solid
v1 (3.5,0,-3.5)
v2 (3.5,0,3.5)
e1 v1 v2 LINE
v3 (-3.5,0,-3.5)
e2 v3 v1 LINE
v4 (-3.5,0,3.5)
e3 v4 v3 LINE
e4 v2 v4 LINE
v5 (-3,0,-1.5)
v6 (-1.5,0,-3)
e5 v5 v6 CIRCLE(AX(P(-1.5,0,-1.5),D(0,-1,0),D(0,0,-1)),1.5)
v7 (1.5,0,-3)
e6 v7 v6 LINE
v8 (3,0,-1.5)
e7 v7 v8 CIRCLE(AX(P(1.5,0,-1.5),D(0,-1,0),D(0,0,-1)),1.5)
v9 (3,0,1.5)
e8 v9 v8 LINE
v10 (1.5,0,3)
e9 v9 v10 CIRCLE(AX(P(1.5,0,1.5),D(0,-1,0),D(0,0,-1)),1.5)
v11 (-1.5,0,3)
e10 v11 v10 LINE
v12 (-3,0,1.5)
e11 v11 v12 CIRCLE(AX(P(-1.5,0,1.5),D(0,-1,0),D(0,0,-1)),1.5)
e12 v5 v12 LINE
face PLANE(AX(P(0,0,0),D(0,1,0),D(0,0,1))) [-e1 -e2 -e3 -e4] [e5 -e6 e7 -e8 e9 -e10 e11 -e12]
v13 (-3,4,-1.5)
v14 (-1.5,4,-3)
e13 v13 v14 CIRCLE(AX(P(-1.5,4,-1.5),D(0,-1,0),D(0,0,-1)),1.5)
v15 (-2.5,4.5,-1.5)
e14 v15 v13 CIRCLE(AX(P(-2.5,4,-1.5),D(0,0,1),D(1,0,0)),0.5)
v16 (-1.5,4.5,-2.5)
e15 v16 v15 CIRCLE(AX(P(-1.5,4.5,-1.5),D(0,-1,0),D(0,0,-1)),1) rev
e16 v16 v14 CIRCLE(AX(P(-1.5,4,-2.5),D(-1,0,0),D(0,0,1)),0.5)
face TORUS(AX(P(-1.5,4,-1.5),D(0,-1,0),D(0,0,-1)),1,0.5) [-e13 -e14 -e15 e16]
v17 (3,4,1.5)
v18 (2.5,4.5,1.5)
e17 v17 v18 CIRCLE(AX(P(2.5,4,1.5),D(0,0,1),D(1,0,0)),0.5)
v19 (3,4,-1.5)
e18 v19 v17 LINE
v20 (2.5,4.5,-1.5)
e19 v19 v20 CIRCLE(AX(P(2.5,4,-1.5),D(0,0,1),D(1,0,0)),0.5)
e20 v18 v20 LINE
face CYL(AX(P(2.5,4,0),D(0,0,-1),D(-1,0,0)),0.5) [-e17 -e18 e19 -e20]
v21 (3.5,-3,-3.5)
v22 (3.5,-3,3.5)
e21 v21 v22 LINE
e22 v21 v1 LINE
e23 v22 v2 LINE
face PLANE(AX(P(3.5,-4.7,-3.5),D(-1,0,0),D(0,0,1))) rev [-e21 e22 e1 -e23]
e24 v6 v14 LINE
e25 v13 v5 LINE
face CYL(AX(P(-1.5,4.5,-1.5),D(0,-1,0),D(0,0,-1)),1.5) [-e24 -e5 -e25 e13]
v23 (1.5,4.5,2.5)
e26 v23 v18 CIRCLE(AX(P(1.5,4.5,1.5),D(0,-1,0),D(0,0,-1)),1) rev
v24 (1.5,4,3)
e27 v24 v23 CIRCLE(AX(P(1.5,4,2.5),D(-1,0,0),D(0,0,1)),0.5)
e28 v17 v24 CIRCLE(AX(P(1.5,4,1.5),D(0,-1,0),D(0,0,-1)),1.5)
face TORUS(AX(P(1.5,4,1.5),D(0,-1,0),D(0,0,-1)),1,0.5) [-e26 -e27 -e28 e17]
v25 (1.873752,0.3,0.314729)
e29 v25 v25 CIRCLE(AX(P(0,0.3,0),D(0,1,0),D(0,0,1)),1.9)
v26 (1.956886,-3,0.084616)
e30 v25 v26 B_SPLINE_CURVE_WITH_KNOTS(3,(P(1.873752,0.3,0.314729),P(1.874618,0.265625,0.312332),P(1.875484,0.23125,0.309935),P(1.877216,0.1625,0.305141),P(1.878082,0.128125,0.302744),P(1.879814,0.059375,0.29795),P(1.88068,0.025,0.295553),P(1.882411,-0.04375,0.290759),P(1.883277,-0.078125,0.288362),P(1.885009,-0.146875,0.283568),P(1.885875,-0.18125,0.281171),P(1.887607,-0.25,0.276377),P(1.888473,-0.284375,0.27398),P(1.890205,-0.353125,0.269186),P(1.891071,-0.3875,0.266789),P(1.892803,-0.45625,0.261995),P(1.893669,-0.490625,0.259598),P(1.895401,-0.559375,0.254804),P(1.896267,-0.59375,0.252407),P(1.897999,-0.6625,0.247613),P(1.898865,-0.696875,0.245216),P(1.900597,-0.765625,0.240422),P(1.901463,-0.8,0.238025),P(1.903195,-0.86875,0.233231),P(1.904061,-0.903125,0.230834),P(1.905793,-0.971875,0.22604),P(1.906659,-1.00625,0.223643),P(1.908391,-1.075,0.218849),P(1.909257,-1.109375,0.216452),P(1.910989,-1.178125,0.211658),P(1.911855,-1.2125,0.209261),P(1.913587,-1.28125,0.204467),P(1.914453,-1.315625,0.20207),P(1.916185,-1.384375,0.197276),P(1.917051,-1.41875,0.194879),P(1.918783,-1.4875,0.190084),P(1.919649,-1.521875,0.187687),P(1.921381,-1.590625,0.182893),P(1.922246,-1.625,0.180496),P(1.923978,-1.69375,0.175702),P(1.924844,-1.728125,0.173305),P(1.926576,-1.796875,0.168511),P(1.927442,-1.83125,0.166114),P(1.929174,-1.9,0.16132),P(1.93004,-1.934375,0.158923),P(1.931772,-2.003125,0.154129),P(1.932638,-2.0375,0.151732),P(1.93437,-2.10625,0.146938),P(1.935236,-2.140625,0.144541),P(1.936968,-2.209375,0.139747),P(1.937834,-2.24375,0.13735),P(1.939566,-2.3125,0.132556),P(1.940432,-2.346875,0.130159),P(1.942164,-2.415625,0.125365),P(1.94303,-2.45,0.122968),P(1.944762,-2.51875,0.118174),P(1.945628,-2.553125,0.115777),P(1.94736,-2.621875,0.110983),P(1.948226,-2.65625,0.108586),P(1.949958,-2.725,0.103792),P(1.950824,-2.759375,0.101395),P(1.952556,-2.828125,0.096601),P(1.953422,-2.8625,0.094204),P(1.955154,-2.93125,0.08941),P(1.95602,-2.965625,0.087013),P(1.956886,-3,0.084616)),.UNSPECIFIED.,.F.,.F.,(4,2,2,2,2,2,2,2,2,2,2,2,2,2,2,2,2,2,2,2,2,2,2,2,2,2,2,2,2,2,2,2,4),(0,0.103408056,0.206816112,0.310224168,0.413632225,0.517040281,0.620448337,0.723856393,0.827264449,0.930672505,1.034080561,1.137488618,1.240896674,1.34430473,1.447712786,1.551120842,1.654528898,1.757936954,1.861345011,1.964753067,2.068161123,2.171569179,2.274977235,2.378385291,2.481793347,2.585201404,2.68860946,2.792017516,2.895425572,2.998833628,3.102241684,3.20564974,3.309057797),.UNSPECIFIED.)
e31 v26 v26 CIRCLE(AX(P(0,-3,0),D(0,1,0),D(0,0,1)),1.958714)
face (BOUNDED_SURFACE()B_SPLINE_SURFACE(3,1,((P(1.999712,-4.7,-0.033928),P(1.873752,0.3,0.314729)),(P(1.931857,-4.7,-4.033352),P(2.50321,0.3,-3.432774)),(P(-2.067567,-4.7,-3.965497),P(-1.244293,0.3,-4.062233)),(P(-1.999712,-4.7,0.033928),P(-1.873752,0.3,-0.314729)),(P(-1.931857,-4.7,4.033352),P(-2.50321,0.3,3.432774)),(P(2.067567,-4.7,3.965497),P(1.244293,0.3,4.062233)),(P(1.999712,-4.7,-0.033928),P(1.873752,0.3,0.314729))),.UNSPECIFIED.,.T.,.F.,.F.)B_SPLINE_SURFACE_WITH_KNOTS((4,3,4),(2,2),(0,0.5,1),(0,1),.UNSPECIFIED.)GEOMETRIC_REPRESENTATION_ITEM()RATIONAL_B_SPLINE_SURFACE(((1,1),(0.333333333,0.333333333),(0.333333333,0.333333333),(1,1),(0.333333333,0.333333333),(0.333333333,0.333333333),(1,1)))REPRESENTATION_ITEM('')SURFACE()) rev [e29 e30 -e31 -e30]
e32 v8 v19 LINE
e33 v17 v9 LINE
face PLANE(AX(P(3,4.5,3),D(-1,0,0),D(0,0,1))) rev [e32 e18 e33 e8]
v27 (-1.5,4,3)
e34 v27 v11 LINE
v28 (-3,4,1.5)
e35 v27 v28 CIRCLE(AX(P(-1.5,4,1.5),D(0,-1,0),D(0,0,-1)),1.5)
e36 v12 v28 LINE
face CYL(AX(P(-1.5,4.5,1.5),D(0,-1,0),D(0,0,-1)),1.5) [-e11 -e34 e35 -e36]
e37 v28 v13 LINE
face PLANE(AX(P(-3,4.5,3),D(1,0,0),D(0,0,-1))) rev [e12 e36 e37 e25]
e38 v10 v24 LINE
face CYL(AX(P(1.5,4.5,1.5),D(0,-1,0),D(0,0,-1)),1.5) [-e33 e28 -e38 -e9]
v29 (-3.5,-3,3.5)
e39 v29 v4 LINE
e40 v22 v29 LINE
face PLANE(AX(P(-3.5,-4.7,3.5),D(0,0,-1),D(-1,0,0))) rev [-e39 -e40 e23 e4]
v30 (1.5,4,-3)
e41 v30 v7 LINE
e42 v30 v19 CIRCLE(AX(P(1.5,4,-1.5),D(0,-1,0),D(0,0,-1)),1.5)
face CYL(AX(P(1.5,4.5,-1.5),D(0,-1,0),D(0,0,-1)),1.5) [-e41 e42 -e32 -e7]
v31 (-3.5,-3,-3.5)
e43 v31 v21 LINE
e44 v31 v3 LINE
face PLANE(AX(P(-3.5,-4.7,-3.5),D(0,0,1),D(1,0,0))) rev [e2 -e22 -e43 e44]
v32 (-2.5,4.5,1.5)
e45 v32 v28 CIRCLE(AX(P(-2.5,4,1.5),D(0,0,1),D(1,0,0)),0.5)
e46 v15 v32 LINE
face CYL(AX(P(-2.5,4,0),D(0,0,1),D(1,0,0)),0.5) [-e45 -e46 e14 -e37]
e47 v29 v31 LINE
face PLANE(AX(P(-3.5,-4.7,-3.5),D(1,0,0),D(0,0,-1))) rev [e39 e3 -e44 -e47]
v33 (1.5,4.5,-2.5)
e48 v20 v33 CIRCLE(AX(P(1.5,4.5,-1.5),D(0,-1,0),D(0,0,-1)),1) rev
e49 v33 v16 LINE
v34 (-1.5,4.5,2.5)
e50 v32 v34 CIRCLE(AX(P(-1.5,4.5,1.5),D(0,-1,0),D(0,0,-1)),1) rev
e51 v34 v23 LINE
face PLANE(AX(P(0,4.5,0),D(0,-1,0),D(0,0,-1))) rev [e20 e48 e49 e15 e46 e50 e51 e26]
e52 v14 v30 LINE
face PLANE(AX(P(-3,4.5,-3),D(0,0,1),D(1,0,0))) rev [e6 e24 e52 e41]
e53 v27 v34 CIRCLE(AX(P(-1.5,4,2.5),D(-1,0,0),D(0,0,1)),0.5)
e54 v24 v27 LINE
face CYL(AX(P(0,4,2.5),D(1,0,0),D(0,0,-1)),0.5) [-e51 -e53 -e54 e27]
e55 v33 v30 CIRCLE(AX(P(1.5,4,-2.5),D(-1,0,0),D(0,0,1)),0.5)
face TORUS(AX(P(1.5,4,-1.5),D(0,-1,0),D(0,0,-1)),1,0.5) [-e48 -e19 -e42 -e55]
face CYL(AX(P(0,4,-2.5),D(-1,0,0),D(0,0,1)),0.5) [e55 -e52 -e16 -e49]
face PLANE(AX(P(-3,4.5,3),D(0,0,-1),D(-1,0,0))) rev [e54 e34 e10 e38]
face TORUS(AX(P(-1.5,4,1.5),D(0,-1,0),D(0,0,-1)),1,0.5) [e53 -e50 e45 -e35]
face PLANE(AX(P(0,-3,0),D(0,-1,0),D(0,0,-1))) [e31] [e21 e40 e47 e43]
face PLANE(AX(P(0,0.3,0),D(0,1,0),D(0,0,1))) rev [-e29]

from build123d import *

# Parameters (mm, degrees)
SKETCH_1_W          = 6
SKETCH_1_H          = 6
EXTRUDE_1_DEPTH     = 4.5
FILLET_1_R          = 1.5
FILLET_3_R          = 0.5
SKETCH_2_W          = 7
SKETCH_2_H          = 7
EXTRUDE_2_DEPTH     = 4.7
SKETCH_5_W          = 7
SKETCH_5_H          = 7
CUT_EXTRUDE_1_DEPTH = 1.7


with BuildPart() as part:
    # 草图1 → 凸台-拉伸1 (new body)
    with BuildSketch(Plane(origin=(0, 0, 0), x_dir=(1, 0, 0), z_dir=(0, 1, 0))):
        Rectangle(SKETCH_1_W, SKETCH_1_H)
    extrude(amount=EXTRUDE_1_DEPTH)

    # 圆角1
    fillet_1_edges = [part.edges().sort_by_distance(p)[0] for p in [
        (3, 2.25, 3),
        (-3, 2.25, 3),
        (-3, 2.25, -3),
        (3, 2.25, -3),
    ]]
    fillet(fillet_1_edges, radius=FILLET_1_R)

    # 圆角3
    fillet_3_edges = [part.edges().sort_by_distance(p)[0] for p in [
        (-3, 4.5, 0),
        (0, 4.5, -3),
        (3, 4.5, 0),
        (0, 4.5, 3),
        (-2.560660172, 4.5, 2.560660172),
        (2.560660172, 4.5, 2.560660172),
        (2.560660172, 4.5, -2.560660172),
        (-2.560660172, 4.5, -2.560660172),
    ]]
    fillet(fillet_3_edges, radius=FILLET_3_R)

    # 草图2 → 凸台-拉伸2 (add)
    with BuildSketch(Plane.XZ):
        Rectangle(SKETCH_2_W, SKETCH_2_H)
    extrude(amount=EXTRUDE_2_DEPTH)

    # 切除-放样1: read off the stored shape, not the designer's step
    # 切除-放样1: loft between two sections, ruled curve by curve
    loft_1_from = [
        Edge.make_bspline([(1.999712209, -4.7, -0.033927573), (1.931857063, -4.7, -4.033351992), (-2.067567356, -4.7, -3.965496845), (-1.999712209, -4.7, 0.033927573), (-1.931857063, -4.7, 4.033351992), (2.067567356, -4.7, 3.965496845), (1.999712209, -4.7, -0.033927573)], [0, 0, 0, 0, 0.5, 0.5, 0.5, 1, 1, 1, 1], 3, [1, 0.333333333, 0.333333333, 1, 0.333333333, 0.333333333, 1]),
    ]
    loft_1_to = [
        Edge.make_bspline([(1.873751703, 0.3, 0.314729335), (2.503210373, 0.3, -3.432774072), (-1.244293034, 0.3, -4.062232741), (-1.873751703, 0.3, -0.314729335), (-2.503210373, 0.3, 3.432774072), (1.244293034, 0.3, 4.062232741), (1.873751703, 0.3, 0.314729335)], [0, 0, 0, 0, 0.5, 0.5, 0.5, 1, 1, 1, 1], 3, [1, 0.333333333, 0.333333333, 1, 0.333333333, 0.333333333, 1]),
    ]
    loft_1 = Solid(Shell([*[Face.make_surface_from_curves(loft_1_from[k], loft_1_to[k]) for k in range(1)], Face(Wire(loft_1_from)), Face(Wire(loft_1_to))]))
    add(loft_1, mode=Mode.SUBTRACT)

    # 草图5 → 切除-拉伸1 (cut)
    with BuildSketch(Plane.XZ.offset(4.7)):
        Rectangle(SKETCH_5_W, SKETCH_5_H)
    extrude(amount=-CUT_EXTRUDE_1_DEPTH, mode=Mode.SUBTRACT)


solid = part.part
